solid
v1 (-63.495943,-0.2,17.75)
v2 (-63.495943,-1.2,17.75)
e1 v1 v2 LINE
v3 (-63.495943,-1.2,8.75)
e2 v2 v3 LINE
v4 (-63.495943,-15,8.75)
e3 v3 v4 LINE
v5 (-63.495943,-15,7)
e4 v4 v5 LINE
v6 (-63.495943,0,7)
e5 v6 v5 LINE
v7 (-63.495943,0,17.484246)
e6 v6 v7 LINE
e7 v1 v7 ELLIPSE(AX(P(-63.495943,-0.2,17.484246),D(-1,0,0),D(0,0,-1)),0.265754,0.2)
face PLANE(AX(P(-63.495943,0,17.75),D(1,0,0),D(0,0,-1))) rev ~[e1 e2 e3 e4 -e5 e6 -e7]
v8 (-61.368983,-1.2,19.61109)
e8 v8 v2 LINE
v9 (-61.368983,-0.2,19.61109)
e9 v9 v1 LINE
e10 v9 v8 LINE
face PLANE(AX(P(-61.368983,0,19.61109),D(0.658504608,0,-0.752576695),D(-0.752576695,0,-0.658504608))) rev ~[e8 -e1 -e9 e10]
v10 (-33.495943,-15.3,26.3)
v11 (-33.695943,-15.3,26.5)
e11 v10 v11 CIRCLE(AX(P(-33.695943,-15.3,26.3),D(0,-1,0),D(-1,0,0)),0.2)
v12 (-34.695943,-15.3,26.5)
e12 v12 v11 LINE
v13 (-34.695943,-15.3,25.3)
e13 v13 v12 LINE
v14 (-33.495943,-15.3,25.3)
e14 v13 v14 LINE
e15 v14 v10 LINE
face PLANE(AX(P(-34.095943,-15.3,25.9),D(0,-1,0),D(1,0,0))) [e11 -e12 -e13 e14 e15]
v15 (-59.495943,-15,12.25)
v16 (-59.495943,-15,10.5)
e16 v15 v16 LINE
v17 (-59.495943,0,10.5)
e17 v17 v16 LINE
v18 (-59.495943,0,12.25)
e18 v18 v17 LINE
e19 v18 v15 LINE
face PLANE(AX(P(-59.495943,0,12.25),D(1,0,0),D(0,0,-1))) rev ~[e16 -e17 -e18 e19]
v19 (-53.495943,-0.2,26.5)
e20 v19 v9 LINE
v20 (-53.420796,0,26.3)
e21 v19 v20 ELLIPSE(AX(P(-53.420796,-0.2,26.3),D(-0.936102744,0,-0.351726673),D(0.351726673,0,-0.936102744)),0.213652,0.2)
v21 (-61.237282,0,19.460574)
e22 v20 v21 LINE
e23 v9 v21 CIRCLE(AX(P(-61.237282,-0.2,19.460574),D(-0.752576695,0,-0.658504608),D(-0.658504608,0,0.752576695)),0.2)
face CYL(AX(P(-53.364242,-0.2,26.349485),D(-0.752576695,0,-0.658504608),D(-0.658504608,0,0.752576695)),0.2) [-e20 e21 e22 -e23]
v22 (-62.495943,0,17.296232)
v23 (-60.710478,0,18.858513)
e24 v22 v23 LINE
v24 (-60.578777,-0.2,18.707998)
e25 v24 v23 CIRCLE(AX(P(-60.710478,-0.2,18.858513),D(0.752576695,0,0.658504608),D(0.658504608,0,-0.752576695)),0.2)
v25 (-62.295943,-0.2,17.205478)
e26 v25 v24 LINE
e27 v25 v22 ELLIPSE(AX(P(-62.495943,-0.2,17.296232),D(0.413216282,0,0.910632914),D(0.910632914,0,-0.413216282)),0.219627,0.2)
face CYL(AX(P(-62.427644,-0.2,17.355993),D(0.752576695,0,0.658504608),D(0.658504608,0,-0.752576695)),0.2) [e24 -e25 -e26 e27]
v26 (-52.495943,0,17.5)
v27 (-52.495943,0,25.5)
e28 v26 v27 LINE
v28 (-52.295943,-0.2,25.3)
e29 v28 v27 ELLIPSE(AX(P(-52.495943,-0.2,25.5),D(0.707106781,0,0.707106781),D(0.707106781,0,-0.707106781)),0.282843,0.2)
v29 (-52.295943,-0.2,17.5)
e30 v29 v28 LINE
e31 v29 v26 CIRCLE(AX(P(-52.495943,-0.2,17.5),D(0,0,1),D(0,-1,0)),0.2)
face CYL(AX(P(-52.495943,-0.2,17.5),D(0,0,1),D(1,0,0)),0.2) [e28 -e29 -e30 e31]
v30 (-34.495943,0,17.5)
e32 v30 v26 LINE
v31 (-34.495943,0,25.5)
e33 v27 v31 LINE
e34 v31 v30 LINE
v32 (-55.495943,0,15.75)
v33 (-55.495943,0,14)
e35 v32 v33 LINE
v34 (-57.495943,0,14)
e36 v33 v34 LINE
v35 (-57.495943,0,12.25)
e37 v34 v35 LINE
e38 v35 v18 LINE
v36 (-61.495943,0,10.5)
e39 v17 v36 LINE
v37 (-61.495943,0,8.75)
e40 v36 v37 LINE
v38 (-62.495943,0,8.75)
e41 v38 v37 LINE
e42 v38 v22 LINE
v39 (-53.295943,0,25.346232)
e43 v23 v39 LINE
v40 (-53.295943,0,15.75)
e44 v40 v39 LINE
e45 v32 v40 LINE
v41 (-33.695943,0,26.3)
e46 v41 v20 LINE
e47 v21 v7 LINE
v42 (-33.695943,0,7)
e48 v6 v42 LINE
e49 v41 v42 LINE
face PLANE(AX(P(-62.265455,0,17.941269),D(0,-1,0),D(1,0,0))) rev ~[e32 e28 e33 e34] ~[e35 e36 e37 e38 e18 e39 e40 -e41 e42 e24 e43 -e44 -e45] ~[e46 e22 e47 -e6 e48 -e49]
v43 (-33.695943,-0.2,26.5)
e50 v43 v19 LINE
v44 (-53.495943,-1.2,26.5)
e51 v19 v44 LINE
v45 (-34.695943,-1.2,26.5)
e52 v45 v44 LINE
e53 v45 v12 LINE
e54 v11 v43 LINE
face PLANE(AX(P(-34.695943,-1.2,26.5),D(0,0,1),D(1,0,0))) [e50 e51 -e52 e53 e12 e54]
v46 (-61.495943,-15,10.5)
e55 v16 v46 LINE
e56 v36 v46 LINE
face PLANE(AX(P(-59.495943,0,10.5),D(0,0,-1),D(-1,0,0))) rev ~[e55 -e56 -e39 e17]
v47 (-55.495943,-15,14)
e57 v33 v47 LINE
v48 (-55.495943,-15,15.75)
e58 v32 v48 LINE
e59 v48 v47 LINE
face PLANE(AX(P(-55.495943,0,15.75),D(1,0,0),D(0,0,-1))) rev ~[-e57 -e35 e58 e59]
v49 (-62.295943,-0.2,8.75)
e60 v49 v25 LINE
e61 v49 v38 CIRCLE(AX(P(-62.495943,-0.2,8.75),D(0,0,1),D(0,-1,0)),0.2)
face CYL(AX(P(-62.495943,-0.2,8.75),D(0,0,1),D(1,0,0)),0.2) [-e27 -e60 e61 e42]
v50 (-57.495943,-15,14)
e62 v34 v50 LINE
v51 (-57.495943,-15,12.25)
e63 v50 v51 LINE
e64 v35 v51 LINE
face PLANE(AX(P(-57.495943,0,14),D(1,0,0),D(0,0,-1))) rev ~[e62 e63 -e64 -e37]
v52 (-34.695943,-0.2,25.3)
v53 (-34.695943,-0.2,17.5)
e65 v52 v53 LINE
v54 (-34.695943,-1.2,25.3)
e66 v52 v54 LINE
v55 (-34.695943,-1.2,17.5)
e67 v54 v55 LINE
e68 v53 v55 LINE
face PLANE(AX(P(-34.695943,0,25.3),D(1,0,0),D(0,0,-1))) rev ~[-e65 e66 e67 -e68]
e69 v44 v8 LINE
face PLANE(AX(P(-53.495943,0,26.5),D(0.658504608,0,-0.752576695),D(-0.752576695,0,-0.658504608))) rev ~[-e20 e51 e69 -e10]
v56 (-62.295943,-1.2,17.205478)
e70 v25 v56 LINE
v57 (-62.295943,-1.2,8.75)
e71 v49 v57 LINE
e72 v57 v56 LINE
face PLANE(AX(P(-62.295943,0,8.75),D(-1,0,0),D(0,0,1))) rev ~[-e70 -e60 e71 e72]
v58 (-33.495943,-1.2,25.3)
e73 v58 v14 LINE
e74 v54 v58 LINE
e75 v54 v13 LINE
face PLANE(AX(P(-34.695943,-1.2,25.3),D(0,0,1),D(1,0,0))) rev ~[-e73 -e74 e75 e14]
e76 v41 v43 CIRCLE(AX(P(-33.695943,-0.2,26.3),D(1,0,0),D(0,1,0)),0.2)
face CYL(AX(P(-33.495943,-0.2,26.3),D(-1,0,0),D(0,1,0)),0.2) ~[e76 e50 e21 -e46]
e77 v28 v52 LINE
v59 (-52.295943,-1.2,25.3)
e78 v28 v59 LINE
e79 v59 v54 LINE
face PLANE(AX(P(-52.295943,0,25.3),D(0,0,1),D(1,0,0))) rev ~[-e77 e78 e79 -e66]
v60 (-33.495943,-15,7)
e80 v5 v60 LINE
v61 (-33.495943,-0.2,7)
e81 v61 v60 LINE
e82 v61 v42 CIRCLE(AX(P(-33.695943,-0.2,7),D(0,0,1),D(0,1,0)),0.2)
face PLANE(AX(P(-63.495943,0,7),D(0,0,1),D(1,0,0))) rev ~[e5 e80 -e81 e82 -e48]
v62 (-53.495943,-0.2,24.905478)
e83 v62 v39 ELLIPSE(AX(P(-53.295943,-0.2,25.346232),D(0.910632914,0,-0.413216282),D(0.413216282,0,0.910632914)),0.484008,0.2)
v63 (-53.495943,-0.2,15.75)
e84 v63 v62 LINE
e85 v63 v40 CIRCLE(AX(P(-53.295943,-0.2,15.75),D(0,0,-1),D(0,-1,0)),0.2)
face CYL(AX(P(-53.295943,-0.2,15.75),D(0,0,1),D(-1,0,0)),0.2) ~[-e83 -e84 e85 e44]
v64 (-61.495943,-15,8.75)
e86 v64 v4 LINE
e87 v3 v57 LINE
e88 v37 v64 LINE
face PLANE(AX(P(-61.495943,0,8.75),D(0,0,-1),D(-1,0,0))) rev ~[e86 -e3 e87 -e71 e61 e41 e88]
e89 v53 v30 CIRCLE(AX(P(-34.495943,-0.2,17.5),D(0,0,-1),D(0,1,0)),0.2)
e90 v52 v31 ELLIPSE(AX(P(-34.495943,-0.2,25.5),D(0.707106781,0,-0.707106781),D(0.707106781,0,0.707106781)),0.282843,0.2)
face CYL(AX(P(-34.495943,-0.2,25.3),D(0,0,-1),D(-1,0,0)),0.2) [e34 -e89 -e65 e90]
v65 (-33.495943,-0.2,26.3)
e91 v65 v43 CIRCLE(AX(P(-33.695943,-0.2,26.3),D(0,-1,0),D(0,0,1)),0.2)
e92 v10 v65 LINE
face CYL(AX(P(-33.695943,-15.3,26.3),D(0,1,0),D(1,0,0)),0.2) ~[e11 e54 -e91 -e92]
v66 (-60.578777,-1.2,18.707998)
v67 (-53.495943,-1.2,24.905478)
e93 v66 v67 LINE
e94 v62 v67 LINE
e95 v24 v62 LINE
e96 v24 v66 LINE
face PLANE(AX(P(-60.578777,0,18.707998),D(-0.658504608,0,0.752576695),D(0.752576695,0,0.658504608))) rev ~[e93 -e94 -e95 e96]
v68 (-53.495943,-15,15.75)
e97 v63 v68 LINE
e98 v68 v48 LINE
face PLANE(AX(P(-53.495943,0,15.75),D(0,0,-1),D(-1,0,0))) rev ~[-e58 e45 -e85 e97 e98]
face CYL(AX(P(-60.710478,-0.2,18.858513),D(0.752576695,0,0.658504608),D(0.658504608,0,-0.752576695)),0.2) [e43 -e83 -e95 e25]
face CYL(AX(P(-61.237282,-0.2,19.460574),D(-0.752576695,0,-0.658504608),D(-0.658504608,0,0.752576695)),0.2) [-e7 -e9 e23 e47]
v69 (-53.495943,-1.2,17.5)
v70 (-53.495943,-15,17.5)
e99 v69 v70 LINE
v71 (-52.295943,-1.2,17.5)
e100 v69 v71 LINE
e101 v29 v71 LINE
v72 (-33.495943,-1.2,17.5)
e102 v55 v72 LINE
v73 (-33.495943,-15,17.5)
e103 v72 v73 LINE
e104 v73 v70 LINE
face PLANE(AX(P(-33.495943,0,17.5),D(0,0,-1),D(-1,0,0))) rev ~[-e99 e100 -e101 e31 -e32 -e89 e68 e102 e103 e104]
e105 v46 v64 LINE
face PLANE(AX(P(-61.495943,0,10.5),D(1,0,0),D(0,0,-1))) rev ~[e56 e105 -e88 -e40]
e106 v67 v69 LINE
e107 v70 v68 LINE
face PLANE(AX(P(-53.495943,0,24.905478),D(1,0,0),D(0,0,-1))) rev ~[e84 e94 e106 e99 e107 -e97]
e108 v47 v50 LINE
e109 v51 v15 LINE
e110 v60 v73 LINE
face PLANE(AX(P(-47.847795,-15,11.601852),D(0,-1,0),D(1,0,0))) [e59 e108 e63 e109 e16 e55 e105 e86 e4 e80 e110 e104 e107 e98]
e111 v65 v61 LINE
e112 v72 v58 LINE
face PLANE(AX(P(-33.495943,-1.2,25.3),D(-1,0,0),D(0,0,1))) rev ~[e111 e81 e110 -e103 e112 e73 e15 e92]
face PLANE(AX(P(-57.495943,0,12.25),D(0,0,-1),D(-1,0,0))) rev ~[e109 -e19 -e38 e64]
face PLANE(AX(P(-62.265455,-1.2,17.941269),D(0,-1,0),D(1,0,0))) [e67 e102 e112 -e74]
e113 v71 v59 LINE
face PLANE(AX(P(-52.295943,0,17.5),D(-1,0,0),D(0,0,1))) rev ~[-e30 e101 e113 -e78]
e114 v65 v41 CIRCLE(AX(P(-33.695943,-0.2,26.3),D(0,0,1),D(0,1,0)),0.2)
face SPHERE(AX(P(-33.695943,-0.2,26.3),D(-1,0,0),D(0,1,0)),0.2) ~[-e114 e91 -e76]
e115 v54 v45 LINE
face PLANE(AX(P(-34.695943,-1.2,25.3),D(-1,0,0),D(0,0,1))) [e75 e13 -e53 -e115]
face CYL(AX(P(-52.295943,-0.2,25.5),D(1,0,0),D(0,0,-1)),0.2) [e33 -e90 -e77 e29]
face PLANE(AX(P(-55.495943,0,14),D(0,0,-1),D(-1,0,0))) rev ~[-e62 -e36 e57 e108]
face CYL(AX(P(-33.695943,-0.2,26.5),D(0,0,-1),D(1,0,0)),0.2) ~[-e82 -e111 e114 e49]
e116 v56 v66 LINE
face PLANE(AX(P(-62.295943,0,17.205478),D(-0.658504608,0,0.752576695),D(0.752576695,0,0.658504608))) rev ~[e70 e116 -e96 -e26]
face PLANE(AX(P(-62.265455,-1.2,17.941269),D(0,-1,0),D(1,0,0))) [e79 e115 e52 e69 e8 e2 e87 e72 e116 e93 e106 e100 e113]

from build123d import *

# Parameters (mm, degrees)
F1_DEPTH = 15
F2_DEPTH = 1.2
F3_W     = 1.2
F3_H     = 1.2
F4_DEPTH = 14.1
F5_R     = 0.2


# Not quite as in the source:
# - a feature names something its author has since deleted; it is built from what else it names


with BuildPart() as f1:
    # F0 (on Front) → F1 (new body)
    with BuildSketch(Plane.XZ):
        Polygon((-62.2959427714, 8.75), (-63.4959427714, 8.75), (-63.4959427714, 7), (-36.9959427714, 7), (-33.4959427714, 7), (-33.4959427714, 17.5), (-34.6959427714, 17.5), (-52.2959427714, 17.5), (-53.4959427714, 17.5), (-53.4959427714, 15.75), (-55.4959427714, 15.75), (-55.4959427714, 14), (-57.4959427714, 14), (-57.4959427714, 12.25), (-59.4959427714, 12.25), (-59.4959427714, 10.5), (-61.4959427714, 10.5), (-61.4959427714, 8.75), align=None)
    extrude(amount=F1_DEPTH)

    # F0 (on Front) → F2 (join)
    with BuildSketch(Plane.XZ):
        Polygon((-61.3689829591, 19.6110898358), (-63.4959427714, 17.75), (-63.4959427714, 17.0856158867), (-63.4959427714, 16.1554781281), (-62.2959427714, 17.2054781281), (-60.5787774297, 18.7079978021), align=None)
        Polygon((-62.2959427714, 17.2054781281), (-63.4959427714, 16.1554781281), (-63.4959427714, 8.75), (-62.2959427714, 8.75), align=None)
        Polygon((-52.2959427714, 26.5), (-53.4959427714, 26.5), (-53.4959427714, 24.9054781281), (-53.4959427714, 17.5), (-52.2959427714, 17.5), (-52.2959427714, 25.3), (-52.2959427714, 26), align=None)
        Polygon((-53.4959427714, 26.5), (-61.3689829591, 19.6110898358), (-60.5787774297, 18.7079978021), (-53.4959427714, 24.9054781281), align=None)
        Polygon((-34.6959427714, 26.5), (-52.2959427714, 26.5), (-52.2959427714, 26), (-52.2959427714, 25.3), (-34.6959427714, 25.3), align=None)
        Polygon((-33.4959427714, 26.5), (-34.6959427714, 26.5), (-34.6959427714, 25.3), (-34.6959427714, 17.5), (-33.4959427714, 17.5), align=None)
    extrude(amount=F2_DEPTH)

    # F3 (on face) → F4 (join)
    with BuildSketch(Plane.XZ.offset(1.2)):
        with Locations((-34.0959427714, 25.9)):
            Rectangle(F3_W, F3_H)
    extrude(amount=F4_DEPTH)

    # F5
    f5_edges = [f1.edges().sort_by_distance(p)[0] for p in [
        (-43.495943, 0, 25.3),
        (-34.695943, 0, 21.4),
        (-52.295943, 0, 21.4),
        (-57.895943, 0, 21.055478),
        (-53.495943, 0, 20.327739),
        (-62.295943, 0, 12.977739),
        (-58.495943, 0, 22.125),
        (-43.495943, 0, 26.5),
        (-33.495943, 0, 16.75),
        (-33.495943, -7.65, 26.5),
    ]]
    fillet(f5_edges, radius=F5_R)


solid = f1.part
